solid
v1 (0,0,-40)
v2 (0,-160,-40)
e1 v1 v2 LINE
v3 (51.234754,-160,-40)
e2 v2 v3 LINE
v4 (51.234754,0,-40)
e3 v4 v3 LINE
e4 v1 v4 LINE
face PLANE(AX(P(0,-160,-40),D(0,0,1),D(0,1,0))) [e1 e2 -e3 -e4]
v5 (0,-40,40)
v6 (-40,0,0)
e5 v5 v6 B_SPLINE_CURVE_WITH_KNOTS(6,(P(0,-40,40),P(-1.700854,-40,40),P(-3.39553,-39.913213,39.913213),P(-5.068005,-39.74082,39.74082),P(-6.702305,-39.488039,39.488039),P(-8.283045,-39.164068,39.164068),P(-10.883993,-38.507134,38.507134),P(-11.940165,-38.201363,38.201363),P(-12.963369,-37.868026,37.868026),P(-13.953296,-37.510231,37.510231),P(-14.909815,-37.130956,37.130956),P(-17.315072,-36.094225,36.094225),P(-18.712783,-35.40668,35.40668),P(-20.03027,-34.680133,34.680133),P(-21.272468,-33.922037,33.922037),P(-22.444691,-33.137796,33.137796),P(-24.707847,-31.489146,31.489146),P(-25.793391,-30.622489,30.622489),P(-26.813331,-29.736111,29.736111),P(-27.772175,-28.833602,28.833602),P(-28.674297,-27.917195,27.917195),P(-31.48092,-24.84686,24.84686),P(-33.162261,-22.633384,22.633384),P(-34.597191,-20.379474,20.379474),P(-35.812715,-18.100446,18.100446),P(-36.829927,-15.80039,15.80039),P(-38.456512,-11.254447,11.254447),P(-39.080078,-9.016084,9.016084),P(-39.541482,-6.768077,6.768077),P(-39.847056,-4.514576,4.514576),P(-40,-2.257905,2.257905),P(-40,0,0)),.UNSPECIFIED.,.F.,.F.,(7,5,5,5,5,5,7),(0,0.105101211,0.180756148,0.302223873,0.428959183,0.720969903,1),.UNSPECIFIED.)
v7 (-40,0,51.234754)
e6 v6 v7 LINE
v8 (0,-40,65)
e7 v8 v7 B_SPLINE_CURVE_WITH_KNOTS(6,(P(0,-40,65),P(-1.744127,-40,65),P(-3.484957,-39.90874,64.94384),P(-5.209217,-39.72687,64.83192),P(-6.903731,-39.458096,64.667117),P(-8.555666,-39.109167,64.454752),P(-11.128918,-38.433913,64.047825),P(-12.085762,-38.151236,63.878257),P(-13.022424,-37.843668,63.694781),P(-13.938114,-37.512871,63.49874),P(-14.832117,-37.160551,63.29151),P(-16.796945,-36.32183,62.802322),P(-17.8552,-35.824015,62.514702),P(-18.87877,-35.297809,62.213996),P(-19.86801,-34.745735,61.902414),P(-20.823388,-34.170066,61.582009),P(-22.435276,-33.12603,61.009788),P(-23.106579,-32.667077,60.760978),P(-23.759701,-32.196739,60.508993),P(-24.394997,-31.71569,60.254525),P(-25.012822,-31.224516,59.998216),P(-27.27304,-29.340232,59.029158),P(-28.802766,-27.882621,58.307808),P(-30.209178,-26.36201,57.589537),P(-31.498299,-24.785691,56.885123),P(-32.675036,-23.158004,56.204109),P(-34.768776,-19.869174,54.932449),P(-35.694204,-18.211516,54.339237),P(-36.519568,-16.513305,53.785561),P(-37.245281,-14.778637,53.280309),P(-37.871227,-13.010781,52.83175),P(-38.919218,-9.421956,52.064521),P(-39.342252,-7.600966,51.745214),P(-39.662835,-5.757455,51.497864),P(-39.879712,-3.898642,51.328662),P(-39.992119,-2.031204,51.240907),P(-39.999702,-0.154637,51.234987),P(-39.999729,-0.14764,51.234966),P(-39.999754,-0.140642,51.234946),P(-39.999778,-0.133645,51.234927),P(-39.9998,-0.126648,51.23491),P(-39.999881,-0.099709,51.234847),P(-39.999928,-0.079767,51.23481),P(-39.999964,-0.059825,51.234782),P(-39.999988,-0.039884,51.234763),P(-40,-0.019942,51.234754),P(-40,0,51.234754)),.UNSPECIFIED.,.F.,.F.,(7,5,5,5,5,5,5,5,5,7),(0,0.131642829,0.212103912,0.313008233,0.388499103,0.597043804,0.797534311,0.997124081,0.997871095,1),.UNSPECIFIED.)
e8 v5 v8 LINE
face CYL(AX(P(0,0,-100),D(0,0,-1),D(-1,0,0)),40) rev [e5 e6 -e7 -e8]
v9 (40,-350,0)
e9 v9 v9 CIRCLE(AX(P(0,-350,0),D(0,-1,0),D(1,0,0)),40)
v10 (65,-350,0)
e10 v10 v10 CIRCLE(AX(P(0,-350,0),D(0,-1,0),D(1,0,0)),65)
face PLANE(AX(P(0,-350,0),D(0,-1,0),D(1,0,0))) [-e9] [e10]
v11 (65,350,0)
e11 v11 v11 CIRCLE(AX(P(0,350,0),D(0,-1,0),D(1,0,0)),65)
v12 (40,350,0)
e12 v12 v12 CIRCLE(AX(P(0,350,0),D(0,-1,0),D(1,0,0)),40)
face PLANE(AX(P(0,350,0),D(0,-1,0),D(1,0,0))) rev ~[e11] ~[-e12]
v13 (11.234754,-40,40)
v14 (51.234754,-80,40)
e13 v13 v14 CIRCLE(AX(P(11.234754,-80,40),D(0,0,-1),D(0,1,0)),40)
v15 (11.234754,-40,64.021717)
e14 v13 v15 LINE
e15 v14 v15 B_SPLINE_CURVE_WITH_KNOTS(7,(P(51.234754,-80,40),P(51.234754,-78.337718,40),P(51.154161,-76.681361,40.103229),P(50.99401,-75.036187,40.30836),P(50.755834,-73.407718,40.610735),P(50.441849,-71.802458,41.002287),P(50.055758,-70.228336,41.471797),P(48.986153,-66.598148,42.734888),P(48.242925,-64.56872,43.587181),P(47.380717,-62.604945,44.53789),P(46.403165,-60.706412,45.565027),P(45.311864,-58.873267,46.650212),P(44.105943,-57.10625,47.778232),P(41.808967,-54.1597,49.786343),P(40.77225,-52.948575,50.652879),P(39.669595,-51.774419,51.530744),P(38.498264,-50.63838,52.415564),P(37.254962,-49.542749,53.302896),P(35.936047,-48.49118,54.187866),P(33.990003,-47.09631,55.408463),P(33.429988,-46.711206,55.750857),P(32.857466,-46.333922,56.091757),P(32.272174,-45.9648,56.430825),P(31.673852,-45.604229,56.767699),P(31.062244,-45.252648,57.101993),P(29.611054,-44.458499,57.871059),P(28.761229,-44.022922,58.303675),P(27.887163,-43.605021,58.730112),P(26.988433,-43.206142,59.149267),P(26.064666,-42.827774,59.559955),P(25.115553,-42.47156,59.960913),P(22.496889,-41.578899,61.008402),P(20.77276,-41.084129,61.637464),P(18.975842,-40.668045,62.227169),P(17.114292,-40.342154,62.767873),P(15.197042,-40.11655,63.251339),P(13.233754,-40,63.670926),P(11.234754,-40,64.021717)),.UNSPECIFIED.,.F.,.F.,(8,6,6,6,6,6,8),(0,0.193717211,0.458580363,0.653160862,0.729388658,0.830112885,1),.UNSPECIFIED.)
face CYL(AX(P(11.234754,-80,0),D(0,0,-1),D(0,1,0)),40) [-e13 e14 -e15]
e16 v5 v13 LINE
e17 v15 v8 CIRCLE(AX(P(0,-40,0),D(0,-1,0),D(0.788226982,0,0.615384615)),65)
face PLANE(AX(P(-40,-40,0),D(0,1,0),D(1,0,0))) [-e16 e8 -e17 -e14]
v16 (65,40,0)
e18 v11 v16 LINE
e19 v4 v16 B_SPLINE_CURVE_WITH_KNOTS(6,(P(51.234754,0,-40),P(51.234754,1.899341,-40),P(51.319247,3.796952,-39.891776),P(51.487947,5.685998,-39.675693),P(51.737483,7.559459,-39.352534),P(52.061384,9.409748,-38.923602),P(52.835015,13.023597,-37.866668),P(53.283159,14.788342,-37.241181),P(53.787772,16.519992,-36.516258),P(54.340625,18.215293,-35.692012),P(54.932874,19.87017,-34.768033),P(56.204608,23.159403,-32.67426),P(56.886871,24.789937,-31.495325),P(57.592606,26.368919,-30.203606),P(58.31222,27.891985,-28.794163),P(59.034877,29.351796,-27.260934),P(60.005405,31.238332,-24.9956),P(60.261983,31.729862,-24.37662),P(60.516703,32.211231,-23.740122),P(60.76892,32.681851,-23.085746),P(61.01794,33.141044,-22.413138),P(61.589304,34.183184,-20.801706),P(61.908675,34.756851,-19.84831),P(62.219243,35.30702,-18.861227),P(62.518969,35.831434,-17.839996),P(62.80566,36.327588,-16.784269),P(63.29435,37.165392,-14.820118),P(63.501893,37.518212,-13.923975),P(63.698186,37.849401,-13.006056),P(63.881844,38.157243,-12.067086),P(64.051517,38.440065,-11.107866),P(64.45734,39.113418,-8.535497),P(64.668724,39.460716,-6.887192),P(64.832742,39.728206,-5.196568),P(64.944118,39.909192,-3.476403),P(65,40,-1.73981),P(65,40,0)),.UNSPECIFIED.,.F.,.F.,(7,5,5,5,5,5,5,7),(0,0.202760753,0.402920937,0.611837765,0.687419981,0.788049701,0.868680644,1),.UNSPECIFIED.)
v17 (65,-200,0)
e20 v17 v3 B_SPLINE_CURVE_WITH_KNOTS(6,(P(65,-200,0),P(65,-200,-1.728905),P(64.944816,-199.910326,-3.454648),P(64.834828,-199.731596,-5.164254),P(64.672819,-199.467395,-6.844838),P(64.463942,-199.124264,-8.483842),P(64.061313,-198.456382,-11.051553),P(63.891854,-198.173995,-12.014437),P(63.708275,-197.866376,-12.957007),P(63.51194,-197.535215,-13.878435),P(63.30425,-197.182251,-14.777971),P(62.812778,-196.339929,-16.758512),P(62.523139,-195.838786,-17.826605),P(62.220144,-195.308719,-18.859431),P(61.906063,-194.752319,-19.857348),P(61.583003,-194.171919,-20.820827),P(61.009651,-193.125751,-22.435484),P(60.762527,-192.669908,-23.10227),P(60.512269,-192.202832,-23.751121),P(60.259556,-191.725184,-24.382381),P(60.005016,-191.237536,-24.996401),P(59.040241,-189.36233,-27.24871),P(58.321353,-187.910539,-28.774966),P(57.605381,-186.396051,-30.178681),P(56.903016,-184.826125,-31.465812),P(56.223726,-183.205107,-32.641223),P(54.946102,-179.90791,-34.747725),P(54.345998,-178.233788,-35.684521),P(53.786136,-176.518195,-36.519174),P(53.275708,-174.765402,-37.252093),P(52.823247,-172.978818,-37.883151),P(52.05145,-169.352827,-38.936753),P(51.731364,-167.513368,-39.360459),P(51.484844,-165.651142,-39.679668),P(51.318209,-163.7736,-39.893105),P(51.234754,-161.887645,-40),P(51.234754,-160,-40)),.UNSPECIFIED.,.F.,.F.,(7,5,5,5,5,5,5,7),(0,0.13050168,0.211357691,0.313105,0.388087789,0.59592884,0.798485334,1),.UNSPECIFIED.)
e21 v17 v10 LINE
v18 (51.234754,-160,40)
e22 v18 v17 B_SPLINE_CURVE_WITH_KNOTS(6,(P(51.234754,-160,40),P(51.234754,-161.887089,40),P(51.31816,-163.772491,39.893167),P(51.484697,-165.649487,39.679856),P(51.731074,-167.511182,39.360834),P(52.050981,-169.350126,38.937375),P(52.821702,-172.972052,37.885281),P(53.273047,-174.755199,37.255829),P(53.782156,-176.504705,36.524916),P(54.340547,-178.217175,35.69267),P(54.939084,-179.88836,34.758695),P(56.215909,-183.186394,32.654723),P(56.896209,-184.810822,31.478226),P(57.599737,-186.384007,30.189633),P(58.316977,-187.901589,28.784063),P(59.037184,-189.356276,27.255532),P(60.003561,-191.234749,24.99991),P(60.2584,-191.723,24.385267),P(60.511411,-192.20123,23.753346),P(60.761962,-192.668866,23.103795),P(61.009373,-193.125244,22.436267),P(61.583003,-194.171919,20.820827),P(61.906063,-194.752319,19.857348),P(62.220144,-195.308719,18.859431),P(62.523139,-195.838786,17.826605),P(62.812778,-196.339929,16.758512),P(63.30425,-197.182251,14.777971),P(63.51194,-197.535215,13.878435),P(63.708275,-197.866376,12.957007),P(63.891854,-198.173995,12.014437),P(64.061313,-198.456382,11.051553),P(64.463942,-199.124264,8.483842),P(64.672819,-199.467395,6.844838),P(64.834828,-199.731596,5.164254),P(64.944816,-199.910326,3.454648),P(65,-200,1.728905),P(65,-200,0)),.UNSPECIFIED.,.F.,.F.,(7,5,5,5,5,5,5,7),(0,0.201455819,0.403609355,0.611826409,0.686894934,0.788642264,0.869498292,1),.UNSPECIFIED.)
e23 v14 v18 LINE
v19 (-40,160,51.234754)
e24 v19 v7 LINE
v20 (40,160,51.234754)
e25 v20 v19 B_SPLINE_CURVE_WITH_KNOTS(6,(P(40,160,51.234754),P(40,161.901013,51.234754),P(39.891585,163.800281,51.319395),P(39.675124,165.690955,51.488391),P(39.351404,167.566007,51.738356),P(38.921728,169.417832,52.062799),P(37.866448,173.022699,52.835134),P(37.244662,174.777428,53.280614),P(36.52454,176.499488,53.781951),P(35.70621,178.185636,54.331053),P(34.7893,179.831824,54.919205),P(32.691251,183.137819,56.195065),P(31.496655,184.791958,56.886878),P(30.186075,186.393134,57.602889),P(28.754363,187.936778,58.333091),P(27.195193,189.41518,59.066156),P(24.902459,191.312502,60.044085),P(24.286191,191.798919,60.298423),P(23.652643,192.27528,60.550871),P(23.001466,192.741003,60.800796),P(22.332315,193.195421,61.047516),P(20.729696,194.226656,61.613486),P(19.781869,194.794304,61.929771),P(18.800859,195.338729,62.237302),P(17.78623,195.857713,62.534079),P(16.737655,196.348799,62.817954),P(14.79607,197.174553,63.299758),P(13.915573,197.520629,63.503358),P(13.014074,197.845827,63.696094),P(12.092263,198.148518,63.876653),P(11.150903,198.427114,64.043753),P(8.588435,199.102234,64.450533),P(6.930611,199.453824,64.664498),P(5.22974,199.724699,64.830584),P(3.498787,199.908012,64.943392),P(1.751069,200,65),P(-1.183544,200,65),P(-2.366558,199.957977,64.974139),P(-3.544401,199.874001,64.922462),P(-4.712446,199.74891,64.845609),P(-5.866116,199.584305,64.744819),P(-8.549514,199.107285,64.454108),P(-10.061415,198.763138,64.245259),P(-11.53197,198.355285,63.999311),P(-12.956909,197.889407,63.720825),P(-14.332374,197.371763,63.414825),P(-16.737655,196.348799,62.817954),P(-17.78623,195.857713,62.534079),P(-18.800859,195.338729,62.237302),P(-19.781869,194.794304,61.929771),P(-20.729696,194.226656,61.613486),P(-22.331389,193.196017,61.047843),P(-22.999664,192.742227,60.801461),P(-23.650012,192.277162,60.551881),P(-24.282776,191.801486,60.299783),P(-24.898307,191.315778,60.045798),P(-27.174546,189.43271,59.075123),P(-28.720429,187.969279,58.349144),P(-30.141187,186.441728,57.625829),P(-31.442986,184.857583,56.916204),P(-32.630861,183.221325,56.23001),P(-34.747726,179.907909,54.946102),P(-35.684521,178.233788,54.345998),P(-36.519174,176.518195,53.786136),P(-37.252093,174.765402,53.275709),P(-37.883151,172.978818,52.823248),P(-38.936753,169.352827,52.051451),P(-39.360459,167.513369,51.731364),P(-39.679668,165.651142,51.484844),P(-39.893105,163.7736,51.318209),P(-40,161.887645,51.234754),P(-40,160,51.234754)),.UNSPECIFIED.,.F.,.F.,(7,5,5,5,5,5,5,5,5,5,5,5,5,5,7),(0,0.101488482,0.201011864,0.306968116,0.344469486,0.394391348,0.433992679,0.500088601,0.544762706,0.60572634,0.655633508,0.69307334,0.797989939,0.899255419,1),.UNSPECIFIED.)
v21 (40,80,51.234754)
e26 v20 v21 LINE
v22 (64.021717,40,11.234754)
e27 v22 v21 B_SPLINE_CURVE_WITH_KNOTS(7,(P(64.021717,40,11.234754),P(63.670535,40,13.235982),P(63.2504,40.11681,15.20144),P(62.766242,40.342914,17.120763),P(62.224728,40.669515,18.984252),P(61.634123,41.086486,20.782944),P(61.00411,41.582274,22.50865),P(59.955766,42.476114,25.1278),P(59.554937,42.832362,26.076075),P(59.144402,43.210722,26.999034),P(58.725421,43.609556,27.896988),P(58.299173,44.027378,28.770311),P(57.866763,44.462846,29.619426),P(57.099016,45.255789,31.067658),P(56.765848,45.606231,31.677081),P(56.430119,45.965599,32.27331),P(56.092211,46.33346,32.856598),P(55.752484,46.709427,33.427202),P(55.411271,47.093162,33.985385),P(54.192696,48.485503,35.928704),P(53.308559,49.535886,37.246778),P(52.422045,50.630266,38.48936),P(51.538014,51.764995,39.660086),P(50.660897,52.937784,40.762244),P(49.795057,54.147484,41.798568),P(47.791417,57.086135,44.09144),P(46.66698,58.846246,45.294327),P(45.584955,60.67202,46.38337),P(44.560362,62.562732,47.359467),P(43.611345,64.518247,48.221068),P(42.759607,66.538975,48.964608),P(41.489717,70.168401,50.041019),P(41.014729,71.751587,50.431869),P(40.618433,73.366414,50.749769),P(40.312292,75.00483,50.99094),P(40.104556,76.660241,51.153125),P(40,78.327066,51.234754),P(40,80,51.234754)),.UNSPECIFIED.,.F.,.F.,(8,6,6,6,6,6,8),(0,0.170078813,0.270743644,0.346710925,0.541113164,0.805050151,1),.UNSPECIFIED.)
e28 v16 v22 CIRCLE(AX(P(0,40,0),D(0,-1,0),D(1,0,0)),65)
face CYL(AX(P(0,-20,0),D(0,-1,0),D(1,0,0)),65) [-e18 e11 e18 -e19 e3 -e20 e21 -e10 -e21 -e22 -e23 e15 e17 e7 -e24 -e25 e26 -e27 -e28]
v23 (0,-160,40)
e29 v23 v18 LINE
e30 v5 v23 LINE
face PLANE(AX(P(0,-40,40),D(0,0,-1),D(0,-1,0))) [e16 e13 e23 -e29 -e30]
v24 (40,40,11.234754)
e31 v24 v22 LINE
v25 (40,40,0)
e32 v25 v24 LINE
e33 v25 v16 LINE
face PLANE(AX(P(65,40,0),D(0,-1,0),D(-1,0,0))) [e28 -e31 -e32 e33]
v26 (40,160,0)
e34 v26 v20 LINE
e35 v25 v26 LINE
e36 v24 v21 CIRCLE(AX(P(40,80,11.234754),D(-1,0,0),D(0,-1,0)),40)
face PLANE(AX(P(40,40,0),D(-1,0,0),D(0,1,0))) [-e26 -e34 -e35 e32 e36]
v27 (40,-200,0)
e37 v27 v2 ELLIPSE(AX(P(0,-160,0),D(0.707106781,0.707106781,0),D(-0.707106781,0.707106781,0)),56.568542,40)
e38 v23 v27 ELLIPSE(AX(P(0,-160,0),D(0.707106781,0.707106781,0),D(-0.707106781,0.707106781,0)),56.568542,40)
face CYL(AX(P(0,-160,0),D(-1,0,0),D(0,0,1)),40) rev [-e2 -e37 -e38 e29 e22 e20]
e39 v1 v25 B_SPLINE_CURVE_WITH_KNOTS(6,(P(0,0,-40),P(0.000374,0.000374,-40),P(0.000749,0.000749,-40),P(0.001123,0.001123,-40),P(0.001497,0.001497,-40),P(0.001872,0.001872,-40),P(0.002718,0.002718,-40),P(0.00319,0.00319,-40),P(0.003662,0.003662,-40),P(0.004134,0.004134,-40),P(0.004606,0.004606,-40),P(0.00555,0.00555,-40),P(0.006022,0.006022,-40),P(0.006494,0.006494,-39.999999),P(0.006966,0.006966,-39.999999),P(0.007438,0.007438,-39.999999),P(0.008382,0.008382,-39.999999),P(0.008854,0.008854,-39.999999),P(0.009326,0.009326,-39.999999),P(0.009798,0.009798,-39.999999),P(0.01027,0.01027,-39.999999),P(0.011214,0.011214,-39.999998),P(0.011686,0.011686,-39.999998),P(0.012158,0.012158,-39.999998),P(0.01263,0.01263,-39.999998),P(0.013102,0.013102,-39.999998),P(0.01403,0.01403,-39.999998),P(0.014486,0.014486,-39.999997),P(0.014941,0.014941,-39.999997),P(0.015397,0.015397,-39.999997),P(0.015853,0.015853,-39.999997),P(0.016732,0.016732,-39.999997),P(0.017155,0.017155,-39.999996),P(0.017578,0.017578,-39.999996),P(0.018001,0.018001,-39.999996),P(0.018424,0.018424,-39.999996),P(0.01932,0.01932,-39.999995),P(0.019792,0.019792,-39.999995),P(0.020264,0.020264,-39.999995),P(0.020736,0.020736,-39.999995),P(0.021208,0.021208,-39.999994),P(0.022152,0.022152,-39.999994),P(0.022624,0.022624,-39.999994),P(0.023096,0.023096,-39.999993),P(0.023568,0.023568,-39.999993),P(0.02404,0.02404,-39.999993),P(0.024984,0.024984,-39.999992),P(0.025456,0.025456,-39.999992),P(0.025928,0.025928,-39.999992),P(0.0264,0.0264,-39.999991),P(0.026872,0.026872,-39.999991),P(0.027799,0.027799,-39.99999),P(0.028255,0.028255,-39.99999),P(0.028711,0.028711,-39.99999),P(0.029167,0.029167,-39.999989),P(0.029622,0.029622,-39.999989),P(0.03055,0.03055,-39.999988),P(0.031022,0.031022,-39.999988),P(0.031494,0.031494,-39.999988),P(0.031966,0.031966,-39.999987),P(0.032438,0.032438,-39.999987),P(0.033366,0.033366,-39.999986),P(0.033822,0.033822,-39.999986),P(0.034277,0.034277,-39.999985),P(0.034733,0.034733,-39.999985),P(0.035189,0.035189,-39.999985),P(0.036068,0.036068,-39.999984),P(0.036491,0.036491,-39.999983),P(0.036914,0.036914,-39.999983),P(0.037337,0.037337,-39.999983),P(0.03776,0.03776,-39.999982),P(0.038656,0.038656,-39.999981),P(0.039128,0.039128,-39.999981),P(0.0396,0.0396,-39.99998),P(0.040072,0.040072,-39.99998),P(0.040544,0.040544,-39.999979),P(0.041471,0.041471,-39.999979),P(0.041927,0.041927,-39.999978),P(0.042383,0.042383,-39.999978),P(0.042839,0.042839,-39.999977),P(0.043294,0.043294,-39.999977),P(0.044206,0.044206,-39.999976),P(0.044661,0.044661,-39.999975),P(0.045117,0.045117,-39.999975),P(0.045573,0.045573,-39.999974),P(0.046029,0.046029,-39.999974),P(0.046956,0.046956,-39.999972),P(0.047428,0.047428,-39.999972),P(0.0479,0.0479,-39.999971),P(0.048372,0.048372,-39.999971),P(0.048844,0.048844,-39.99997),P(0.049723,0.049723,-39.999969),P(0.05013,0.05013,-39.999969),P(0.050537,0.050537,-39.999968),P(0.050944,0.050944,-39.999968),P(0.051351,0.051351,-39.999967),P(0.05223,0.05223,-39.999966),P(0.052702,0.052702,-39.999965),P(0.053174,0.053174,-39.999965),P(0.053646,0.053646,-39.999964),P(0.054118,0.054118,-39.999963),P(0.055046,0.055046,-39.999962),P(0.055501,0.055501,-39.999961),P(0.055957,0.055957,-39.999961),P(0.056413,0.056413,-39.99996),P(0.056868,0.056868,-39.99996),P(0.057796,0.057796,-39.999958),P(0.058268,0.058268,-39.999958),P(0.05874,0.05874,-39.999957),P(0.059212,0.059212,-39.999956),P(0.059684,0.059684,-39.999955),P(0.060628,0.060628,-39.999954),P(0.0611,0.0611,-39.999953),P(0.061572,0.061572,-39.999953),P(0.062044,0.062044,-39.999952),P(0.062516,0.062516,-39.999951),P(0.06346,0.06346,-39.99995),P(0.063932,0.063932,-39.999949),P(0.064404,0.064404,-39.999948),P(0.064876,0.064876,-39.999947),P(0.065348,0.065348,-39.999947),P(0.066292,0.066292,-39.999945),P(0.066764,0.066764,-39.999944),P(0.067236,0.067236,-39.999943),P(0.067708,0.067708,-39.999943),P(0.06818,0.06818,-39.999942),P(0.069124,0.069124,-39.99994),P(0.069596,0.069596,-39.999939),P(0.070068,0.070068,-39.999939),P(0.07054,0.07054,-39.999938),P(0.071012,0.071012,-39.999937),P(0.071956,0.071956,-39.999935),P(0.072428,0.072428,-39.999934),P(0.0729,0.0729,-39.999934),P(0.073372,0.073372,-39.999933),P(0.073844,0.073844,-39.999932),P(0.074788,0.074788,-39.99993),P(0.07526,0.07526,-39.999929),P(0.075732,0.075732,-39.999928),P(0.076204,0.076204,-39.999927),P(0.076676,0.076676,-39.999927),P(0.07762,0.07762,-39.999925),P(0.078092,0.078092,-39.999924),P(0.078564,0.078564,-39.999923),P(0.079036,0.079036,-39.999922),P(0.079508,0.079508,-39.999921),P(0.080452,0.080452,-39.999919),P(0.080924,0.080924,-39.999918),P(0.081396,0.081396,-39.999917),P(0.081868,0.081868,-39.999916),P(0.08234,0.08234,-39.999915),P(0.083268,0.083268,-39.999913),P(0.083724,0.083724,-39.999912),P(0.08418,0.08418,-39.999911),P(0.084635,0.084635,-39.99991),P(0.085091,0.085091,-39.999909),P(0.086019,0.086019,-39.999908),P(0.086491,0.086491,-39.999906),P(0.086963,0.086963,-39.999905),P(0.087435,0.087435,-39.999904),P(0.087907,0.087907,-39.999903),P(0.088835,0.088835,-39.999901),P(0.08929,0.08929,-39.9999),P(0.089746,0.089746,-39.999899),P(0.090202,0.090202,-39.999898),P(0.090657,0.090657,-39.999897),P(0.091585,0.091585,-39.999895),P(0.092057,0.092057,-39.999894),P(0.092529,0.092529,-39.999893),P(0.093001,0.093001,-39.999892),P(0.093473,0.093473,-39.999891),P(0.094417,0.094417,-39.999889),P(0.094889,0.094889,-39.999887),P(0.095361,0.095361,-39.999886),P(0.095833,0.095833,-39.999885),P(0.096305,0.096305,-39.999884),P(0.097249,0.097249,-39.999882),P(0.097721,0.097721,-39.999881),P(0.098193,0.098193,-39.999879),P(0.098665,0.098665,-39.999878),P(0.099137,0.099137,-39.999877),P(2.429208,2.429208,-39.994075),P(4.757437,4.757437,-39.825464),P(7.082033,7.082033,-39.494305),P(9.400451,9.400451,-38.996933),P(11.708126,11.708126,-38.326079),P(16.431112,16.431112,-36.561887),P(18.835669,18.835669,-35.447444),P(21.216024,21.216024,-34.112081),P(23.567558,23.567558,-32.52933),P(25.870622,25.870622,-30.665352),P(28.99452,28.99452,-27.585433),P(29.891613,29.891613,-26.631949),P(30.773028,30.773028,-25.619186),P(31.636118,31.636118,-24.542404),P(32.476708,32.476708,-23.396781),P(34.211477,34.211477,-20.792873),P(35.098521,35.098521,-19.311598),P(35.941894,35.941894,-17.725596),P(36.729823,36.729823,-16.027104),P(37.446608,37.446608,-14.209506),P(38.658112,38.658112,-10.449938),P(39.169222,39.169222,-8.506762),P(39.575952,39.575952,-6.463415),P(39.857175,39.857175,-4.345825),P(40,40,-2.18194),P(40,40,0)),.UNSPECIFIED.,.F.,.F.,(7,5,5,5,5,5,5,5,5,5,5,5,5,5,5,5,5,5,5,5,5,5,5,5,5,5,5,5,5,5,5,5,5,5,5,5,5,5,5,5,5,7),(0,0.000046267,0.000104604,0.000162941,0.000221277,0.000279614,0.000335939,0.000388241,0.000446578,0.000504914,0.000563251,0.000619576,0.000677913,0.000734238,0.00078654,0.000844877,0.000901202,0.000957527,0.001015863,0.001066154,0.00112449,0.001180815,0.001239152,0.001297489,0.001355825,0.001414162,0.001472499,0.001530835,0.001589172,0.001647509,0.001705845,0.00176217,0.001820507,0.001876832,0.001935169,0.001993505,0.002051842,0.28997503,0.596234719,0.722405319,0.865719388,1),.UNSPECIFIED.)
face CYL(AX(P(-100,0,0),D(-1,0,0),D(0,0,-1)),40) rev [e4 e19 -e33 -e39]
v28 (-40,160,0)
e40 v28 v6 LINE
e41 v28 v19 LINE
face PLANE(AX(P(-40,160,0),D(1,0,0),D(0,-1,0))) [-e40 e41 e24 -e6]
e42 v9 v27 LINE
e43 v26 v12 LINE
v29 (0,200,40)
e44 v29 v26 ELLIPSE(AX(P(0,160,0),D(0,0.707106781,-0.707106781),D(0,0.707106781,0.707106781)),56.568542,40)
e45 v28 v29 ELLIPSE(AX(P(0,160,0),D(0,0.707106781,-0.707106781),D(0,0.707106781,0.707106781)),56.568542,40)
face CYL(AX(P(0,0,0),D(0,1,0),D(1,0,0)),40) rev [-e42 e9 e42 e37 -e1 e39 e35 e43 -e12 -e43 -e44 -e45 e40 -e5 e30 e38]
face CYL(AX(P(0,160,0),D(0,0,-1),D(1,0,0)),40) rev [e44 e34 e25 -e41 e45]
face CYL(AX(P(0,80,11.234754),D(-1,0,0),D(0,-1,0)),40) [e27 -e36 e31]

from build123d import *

# Parameters (mm, degrees)
F0_R         = 65
F0_R_2       = 40
F1_DEPTH     = 350
F3_DEPTH     = 65.001
F5_DEPTH     = 65.0010001
F6_T4_DEPTH  = 251.2347538298
F6_S5_R      = 65
F6_T6_DEPTH  = 130
F6_S7_R      = 40
F6_T8_DEPTH  = 130
F6_T12_DEPTH = 251.2347538298
F6_S13_R     = 65
F6_T14_DEPTH = 130
F6_S15_R     = 40
F6_T16_DEPTH = 130
F8_DEPTH     = 65.0010001
F10_DEPTH    = 65.0010001


# Not quite as in the source:
# - a fillet or chamfer that OpenCascade refuses, or shapes differently, is made with other operations: its cross-section is extruded or revolved along the edge and cut away or added


with BuildPart() as f1:
    # F0 (on Front) → F1 (new body, symmetric)
    with BuildSketch(Plane.XZ):
        Circle(F0_R)
        Circle(F0_R_2, mode=Mode.SUBTRACT)
    extrude(amount=F1_DEPTH, both=True)

    # F2 (on Top) → F3 (cut, through all)
    with BuildSketch(Plane.XY):
        with BuildLine():
            ThreePointArc((-40, 160), (0, 120), (40, 160))
            ThreePointArc((40, 160), (0, 200), (-40, 160))
        make_face()
        with BuildLine():
            Line((40, 40), (40, 160))
            ThreePointArc((40, 160), (0, 120), (-40, 160))
            Line((-40, 160), (-40, -40))
            Line((-40, -40), (65, -40))
            Line((65, -40), (65, 40))
            Line((65, 40), (40, 40))
        make_face()
    extrude(amount=F3_DEPTH, mode=Mode.SUBTRACT)

    # F4 (on Right) → F5 (cut, through all)
    with BuildSketch(Plane.YZ):
        with BuildLine():
            ThreePointArc((-160, -40), (-131.7157287525, -28.2842712475), (-120, 0))
            ThreePointArc((-120, 0), (-131.7157287525, 28.2842712475), (-160, 40))
            ThreePointArc((-160, 40), (-200, 0), (-160, -40))
        make_face()
        with BuildLine():
            ThreePointArc((-160, 40), (-131.7157287525, 28.2842712475), (-120, 0))
            ThreePointArc((-120, 0), (-131.7157287525, -28.2842712475), (-160, -40))
            Line((-160, -40), (40, -40))
            Line((40, -40), (40, 65))
            Line((40, 65), (-40, 65))
            Line((-40, 65), (-40, 40))
            Line((-40, 40), (-160, 40))
        make_face()
    extrude(amount=F5_DEPTH, mode=Mode.SUBTRACT)

    # F6: fillet of radius 40 on 2 edges, made by hand


with BuildPart() as f6_tool2:
    # F6_s3 → F6_t4 (new body)
    with BuildSketch(Plane.YZ.offset(-100)):
        with BuildLine():
            ThreePointArc((0, -40), (28.2842712475, -28.2842712475), (40, 0))
            Line((40, 0), (40, -40))
            Line((40, -40), (0, -40))
        make_face()
    extrude(amount=F6_T4_DEPTH)

    # F6_s5 → F6_t6 (intersect, symmetric)
    with BuildSketch(Plane.XZ.offset(-20)):
        Circle(F6_S5_R)
    extrude(amount=F6_T6_DEPTH, both=True, mode=Mode.INTERSECT)

    # F6_s7 → F6_t8 (cut, symmetric)
    with BuildSketch(Plane.XZ.offset(-20)):
        Circle(F6_S7_R)
    extrude(amount=F6_T8_DEPTH, both=True, mode=Mode.SUBTRACT)


with BuildPart() as f1_1:
    add(f1.part)

    # F6_t1: union F6_tool2
    add(f6_tool2.part)


with BuildPart() as f6_tool10:
    # F6_s11 → F6_t12 (new body)
    with BuildSketch(Plane.XY.offset(-100)):
        with BuildLine():
            ThreePointArc((-40, 0), (-28.2842712475, -28.2842712475), (0, -40))
            Line((0, -40), (-40, -40))
            Line((-40, -40), (-40, 0))
        make_face()
    extrude(amount=F6_T12_DEPTH)

    # F6_s13 → F6_t14 (intersect, symmetric)
    with BuildSketch(Plane.XZ.offset(20)):
        Circle(F6_S13_R)
    extrude(amount=F6_T14_DEPTH, both=True, mode=Mode.INTERSECT)

    # F6_s15 → F6_t16 (cut, symmetric)
    with BuildSketch(Plane.XZ.offset(20)):
        Circle(F6_S15_R)
    extrude(amount=F6_T16_DEPTH, both=True, mode=Mode.SUBTRACT)


with BuildPart() as f1_2:
    add(f1_1.part)

    # F6_t9: union F6_tool10
    add(f6_tool10.part)

    # F7 (on Top) → F8 (cut, through all)
    with BuildSketch(Plane.XY):
        with BuildLine():
            ThreePointArc((11.2347538298, -40), (39.5190250773, -51.7157287525), (51.2347538298, -80))
            Line((51.2347538298, -80), (51.2347538298, -40))
            Line((51.2347538298, -40), (11.2347538298, -40))
        make_face()
    extrude(amount=F8_DEPTH, mode=Mode.SUBTRACT)

    # F9 (on Right) → F10 (cut, through all)
    with BuildSketch(Plane.YZ):
        with BuildLine():
            ThreePointArc((40, 11.2347538298), (51.7157287525, 39.5190250773), (80, 51.2347538298))
            Line((80, 51.2347538298), (40, 51.2347538298))
            Line((40, 51.2347538298), (40, 11.2347538298))
        make_face()
    extrude(amount=F10_DEPTH, mode=Mode.SUBTRACT)


solid = f1_2.part
